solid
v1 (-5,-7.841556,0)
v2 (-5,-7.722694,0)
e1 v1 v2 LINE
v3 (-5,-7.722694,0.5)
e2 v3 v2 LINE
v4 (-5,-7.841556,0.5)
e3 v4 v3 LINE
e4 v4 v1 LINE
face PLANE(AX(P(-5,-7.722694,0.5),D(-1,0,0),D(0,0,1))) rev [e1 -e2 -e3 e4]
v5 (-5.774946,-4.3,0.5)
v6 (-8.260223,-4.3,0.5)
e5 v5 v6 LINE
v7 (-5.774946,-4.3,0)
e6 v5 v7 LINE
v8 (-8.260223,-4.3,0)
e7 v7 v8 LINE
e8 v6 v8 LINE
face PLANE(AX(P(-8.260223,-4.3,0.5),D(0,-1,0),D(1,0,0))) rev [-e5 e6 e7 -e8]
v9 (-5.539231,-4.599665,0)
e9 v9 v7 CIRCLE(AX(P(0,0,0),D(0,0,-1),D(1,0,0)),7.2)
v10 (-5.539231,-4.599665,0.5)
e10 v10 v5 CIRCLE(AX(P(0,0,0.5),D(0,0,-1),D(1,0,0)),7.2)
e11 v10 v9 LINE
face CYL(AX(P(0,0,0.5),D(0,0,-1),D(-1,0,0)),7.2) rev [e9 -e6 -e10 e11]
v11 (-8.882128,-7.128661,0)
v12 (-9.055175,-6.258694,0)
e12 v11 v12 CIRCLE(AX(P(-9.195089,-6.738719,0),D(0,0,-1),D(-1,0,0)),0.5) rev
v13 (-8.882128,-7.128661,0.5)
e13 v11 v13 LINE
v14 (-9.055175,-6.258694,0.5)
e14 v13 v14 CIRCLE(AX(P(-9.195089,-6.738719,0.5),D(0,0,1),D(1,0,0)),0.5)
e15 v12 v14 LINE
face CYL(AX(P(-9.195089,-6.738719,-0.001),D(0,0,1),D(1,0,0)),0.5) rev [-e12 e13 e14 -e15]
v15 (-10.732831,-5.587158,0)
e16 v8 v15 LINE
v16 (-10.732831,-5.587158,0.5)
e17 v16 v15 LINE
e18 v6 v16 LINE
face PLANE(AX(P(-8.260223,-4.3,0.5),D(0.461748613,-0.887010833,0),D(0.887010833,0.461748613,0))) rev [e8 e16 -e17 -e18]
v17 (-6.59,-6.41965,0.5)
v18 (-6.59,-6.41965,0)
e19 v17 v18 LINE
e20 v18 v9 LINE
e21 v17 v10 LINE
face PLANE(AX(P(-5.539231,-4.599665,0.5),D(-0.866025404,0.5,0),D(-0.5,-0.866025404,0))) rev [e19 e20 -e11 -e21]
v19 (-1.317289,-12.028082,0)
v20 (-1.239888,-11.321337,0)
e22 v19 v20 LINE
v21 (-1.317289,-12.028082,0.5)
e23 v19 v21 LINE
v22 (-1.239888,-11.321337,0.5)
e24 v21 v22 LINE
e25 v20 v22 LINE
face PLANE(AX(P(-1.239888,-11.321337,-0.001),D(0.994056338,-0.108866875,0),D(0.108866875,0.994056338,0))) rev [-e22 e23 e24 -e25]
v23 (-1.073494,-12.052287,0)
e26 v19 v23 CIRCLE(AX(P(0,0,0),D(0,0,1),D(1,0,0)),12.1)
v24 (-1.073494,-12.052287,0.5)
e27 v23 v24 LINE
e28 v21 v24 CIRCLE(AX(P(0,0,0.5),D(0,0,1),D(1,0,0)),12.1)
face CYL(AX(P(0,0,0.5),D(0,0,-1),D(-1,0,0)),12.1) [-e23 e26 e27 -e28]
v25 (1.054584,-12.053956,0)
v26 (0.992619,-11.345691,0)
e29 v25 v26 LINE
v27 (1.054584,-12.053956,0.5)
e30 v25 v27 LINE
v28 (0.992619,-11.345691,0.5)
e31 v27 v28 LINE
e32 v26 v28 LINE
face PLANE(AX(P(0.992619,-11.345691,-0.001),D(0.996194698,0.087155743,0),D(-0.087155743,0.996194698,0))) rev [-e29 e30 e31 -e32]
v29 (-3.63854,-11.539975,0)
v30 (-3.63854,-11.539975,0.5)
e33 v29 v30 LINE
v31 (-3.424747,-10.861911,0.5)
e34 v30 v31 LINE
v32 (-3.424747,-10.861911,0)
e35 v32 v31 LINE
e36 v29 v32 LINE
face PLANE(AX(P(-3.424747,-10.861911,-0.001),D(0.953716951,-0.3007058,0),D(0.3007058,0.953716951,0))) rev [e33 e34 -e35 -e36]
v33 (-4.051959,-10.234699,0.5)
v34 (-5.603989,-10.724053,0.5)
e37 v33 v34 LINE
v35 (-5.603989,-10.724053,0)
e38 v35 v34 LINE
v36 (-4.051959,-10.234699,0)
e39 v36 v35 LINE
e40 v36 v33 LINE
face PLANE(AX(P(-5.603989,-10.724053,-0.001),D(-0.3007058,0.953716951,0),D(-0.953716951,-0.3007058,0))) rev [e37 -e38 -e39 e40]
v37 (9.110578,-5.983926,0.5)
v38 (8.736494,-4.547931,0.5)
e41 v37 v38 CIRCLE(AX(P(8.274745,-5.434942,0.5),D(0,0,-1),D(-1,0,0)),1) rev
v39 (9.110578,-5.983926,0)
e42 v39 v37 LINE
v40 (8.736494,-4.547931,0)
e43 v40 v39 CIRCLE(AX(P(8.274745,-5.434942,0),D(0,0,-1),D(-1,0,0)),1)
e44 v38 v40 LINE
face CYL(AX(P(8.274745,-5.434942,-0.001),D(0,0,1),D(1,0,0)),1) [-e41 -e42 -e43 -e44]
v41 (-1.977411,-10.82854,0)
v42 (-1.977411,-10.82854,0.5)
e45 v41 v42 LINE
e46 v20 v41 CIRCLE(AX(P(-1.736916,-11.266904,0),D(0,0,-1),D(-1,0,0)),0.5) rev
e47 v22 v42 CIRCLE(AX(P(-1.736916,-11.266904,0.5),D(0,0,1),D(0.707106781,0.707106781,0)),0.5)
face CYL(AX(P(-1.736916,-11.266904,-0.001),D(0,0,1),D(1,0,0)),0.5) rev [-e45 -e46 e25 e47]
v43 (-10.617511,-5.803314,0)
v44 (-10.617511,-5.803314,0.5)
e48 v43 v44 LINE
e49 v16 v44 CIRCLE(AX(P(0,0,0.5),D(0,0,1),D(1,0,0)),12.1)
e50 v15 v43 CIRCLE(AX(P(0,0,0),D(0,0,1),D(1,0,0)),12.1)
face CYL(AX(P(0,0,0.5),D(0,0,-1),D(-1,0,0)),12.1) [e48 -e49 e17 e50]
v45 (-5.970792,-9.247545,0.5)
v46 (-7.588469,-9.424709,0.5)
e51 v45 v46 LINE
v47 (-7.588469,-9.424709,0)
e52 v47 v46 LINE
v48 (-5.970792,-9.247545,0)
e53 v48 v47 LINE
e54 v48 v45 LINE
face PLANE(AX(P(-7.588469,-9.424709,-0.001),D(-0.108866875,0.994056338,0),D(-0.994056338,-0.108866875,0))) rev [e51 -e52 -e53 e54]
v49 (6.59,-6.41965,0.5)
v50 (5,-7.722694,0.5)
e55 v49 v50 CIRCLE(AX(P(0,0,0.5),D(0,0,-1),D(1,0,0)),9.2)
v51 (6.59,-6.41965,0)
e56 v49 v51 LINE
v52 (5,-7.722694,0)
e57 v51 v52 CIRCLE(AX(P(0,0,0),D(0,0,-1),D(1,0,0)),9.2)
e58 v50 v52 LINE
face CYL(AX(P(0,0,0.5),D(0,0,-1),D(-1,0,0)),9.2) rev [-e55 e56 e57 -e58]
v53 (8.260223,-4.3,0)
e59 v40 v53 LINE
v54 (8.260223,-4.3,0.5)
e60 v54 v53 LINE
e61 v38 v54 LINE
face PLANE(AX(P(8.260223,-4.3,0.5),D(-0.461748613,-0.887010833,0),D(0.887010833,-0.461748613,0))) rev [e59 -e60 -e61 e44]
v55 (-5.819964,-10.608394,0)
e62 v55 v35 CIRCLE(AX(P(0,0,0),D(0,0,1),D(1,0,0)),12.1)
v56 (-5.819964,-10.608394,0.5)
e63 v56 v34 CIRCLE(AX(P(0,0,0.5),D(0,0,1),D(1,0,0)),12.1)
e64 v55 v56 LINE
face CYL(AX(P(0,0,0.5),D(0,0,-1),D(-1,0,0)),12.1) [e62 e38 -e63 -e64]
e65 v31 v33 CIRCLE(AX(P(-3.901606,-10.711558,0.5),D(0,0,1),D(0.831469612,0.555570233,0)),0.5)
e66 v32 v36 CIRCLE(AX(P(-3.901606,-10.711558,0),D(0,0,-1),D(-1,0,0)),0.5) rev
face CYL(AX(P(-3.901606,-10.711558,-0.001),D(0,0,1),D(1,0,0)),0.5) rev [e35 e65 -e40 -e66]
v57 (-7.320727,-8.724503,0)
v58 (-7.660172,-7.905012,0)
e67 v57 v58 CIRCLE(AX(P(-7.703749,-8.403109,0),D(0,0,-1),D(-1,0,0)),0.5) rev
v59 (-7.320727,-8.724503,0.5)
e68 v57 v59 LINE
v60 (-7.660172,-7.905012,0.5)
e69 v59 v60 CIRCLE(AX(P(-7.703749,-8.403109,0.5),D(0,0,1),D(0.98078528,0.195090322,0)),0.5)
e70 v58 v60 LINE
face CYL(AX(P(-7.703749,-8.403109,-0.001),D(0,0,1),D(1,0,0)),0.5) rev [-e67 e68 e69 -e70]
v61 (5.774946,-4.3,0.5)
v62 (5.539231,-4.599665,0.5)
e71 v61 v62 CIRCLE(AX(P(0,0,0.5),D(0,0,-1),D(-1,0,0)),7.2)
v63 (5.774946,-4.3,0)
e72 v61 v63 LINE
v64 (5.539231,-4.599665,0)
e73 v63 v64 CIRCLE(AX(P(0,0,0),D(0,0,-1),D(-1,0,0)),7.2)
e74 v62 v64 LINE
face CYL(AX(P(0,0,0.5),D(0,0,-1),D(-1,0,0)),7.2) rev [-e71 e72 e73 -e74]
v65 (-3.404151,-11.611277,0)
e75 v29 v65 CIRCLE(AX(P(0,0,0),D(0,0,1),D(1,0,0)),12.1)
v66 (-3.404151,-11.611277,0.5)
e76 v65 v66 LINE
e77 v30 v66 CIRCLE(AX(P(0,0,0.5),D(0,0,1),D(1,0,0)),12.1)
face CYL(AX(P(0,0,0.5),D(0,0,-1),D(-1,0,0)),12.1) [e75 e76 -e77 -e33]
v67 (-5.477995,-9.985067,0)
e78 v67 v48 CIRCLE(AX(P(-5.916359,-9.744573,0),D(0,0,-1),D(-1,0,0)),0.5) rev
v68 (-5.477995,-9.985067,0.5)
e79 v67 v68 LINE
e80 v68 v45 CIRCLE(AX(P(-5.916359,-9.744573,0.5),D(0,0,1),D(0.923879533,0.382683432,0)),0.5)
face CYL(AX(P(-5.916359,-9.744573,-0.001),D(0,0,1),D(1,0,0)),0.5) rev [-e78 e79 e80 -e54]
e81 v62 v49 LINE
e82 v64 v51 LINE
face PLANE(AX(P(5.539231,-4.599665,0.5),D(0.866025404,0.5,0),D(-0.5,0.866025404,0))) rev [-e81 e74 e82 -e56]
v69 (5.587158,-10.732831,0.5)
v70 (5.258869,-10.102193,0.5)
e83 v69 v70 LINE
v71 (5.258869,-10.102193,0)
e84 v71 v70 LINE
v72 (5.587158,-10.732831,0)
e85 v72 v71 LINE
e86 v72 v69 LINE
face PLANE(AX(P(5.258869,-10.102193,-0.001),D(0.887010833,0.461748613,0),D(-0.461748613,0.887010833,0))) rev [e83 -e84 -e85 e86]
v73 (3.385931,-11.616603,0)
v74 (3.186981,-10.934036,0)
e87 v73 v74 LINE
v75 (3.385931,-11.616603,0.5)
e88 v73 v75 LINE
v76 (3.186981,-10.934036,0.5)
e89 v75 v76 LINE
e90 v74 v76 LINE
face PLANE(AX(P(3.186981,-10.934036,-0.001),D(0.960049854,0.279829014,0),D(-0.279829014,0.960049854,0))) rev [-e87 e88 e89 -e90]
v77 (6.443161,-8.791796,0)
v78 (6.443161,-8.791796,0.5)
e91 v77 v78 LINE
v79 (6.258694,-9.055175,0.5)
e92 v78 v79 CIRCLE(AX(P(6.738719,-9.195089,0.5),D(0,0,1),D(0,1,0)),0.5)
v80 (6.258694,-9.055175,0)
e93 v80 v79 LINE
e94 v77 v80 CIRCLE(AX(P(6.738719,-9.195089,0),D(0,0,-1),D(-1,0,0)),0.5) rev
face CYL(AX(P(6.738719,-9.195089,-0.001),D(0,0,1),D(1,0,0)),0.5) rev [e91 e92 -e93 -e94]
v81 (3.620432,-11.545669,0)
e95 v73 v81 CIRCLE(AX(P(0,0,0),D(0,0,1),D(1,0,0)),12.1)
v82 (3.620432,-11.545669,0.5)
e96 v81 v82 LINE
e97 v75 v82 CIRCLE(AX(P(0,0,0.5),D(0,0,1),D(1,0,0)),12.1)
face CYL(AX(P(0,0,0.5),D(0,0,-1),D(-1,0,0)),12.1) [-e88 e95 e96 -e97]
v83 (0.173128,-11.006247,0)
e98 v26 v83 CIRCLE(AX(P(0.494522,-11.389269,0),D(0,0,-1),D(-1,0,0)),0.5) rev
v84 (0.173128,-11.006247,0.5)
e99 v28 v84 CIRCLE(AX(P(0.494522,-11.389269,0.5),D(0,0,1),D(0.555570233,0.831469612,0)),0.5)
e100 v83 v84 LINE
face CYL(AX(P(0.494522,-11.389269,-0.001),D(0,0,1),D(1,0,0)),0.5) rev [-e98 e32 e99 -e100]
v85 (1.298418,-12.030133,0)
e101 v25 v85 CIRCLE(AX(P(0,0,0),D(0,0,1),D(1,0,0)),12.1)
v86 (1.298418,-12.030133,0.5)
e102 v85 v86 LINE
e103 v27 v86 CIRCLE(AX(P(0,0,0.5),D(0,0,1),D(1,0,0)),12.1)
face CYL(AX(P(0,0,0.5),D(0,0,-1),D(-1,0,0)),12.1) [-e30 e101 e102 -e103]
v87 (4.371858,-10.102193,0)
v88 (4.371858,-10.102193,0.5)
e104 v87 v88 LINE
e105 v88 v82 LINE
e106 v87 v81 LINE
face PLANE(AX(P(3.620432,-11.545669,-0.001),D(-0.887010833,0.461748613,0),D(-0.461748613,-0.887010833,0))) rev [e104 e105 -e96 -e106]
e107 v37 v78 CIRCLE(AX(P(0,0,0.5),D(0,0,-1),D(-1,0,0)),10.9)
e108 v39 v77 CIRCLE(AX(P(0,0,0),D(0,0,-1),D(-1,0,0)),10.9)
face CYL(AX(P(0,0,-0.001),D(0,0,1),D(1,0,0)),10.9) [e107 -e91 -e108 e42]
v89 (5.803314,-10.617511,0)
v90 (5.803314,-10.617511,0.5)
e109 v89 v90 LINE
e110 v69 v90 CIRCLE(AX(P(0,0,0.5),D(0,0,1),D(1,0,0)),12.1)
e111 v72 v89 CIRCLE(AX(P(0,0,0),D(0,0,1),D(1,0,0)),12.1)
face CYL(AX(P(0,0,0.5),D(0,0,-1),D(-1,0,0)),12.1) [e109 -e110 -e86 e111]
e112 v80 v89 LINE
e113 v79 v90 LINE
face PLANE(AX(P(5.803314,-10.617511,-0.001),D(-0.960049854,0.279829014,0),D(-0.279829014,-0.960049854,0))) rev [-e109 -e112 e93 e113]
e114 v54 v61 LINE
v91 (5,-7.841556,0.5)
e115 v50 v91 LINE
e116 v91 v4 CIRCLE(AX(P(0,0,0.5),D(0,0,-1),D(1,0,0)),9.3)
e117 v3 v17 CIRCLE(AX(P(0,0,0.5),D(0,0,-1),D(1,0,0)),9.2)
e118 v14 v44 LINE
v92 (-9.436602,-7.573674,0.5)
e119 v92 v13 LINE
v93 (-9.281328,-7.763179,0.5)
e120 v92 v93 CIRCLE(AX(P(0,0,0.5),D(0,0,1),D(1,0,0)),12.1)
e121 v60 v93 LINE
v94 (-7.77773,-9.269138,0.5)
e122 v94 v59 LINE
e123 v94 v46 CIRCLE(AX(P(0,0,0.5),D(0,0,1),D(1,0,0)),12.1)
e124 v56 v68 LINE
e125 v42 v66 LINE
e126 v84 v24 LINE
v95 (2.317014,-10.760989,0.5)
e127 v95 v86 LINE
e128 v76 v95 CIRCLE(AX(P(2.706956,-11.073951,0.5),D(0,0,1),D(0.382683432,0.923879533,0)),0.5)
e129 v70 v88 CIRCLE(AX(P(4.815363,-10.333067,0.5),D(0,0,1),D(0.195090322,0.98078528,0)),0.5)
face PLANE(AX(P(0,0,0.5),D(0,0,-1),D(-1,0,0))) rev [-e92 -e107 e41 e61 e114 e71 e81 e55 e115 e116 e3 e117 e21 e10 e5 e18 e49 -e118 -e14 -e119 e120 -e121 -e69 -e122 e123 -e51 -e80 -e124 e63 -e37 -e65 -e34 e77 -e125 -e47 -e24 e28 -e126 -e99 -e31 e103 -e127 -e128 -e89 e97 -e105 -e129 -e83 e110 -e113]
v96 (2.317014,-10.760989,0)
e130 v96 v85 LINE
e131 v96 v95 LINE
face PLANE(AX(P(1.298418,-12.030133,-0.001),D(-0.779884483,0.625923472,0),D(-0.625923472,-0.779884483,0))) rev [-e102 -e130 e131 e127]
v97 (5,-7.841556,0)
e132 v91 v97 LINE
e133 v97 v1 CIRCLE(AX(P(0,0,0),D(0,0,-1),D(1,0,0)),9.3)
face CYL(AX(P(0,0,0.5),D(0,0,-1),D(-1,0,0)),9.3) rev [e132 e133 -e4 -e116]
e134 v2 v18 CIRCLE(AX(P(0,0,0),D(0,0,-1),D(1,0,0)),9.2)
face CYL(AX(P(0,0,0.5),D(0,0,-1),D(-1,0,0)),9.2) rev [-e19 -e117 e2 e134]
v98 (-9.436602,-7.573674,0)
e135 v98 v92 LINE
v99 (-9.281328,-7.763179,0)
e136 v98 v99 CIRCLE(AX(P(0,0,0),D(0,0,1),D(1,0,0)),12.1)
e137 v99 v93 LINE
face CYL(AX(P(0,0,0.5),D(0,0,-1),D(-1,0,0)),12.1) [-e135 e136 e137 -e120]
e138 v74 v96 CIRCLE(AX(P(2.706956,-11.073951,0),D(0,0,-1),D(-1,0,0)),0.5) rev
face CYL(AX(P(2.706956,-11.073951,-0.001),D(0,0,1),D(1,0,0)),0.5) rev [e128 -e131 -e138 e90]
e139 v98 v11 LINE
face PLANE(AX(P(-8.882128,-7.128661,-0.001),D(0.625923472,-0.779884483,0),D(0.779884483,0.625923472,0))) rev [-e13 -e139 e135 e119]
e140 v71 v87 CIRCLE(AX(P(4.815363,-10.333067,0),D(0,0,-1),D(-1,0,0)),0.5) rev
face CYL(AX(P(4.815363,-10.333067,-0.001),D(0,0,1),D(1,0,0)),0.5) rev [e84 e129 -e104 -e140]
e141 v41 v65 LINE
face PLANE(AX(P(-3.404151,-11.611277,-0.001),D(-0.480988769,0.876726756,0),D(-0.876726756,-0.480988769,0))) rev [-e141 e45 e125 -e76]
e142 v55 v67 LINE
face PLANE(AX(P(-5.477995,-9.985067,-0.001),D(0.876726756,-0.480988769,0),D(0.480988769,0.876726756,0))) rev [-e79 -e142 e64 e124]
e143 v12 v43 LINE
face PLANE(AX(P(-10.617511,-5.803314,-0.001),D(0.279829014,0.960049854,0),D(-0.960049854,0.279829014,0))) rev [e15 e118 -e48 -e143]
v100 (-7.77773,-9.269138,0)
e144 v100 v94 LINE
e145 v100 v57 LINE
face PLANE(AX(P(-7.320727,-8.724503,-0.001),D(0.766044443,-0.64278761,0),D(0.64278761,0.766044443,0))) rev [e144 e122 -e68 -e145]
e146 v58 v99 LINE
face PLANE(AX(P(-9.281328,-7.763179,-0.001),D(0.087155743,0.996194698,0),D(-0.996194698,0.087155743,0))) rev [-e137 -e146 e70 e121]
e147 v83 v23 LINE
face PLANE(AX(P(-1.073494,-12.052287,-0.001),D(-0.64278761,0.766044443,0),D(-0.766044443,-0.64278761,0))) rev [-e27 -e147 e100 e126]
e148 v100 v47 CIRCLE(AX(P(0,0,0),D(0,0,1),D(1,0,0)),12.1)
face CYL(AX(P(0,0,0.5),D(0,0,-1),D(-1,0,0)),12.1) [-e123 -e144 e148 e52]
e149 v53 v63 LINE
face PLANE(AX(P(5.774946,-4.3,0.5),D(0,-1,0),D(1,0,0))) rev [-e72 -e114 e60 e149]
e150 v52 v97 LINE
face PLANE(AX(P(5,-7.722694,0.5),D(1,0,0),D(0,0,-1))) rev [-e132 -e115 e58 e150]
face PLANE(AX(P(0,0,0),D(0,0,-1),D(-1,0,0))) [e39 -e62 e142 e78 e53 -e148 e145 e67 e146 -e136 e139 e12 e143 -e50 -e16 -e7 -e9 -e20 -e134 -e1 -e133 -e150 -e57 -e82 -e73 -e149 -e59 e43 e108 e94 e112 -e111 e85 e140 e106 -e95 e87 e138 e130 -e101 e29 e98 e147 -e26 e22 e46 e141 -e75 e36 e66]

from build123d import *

# Parameters (mm, degrees)
OTHER_10076_5_DEPTH = 0.5
CUT_EXTRUDE1_REACH  = 18.147


# Read off the part's stored shape, not the designer's step: 10076-5
with BuildPart() as part:
    # Other 10076-5 outline → Other 10076-5 (new body)
    with BuildSketch(Plane.XY):
        with BuildLine():
            ThreePointArc((7.573674013, -9.436602245), (7.668819519, -9.359444812), (7.763179028, -9.281328104))
            Line((7.763179028, -9.281328104), (7.919995926, -7.488902759))
            ThreePointArc((7.919995926, -7.488902759), (8.548470738, -6.76266575), (9.110578105, -5.983925684))
            ThreePointArc((9.110578105, -5.983925684), (9.242448569, -5.182849851), (8.736493865, -4.547930843))
            Line((8.736493865, -4.547930843), (8.260223146, -4.3))
            Line((8.260223146, -4.3), (5.774945887, -4.3))
            ThreePointArc((5.774945887, -4.3), (5.659072475, -4.451392897), (5.53923133, -4.5996648))
            Line((5.53923133, -4.5996648), (6.59, -6.419649523))
            ThreePointArc((6.59, -6.419649523), (5.831509763, -7.1157216), (5, -7.722693831))
            Line((5, -7.722693831), (5, -7.841555968))
            ThreePointArc((5, -7.841555968), (0, -9.3), (-5, -7.841555968))
            Line((-5, -7.841555968), (-5, -7.722693831))
            ThreePointArc((-5, -7.722693831), (-5.831509763, -7.1157216), (-6.59, -6.419649523))
            Line((-6.59, -6.419649523), (-5.53923133, -4.5996648))
            ThreePointArc((-5.53923133, -4.5996648), (-5.659072475, -4.451392897), (-5.774945887, -4.3))
            Line((-5.774945887, -4.3), (-8.260223146, -4.3))
            Line((-8.260223146, -4.3), (-10.732831081, -5.58715822))
            ThreePointArc((-10.732831081, -5.58715822), (-10.675718173, -5.6955282), (-10.617511084, -5.803314431))
            Line((-10.617511084, -5.803314431), (-9.055174855, -6.258693914))
            ThreePointArc((-9.055174855, -6.258693914), (-8.704696722, -6.64117368), (-8.882127626, -7.128661083))
            Line((-8.882127626, -7.128661083), (-9.436602245, -7.573674013))
            ThreePointArc((-9.436602245, -7.573674013), (-9.359444812, -7.668819519), (-9.281328104, -7.763179028))
            Line((-9.281328104, -7.763179028), (-7.660171598, -7.905011844))
            ThreePointArc((-7.660171598, -7.905011844), (-7.241809703, -8.211767477), (-7.320727248, -8.724502998))
            Line((-7.320727248, -8.724502998), (-7.777730077, -9.269137762))
            ThreePointArc((-7.777730077, -9.269137762), (-7.683493234, -9.347402405), (-7.588468891, -9.424709008))
            Line((-7.588468891, -9.424709008), (-5.970792243, -9.247544602))
            ThreePointArc((-5.970792243, -9.247544602), (-5.500623999, -9.466787654), (-5.477995427, -9.985067155))
            Line((-5.477995427, -9.985067155), (-5.819964104, -10.608393744))
            ThreePointArc((-5.819964104, -10.608393744), (-5.712269322, -10.666769858), (-5.603989074, -10.724052707))
            Line((-5.603989074, -10.724052707), (-4.05195869, -10.234699407))
            ThreePointArc((-4.05195869, -10.234699407), (-3.548052399, -10.358004491), (-3.424747314, -10.861910782))
            Line((-3.424747314, -10.861910782), (-3.638540174, -11.539975104))
            ThreePointArc((-3.638540174, -11.539975104), (-3.521526102, -11.576219327), (-3.404151099, -11.611277074))
            Line((-3.404151099, -11.611277074), (-1.977410637, -10.828540453))
            ThreePointArc((-1.977410637, -10.828540453), (-1.459131136, -10.851169025), (-1.239888083, -11.321337268))
            Line((-1.239888083, -11.321337268), (-1.317289186, -12.028081692))
            ThreePointArc((-1.317289186, -12.028081692), (-1.195452609, -12.04080118), (-1.073493507, -12.052286575))
            Line((-1.073493507, -12.052286575), (0.173128198, -11.006246762))
            ThreePointArc((0.173128198, -11.006246762), (0.685863719, -10.927329218), (0.992619352, -11.345691113))
            Line((0.992619352, -11.345691113), (1.054584487, -12.053955847))
            ThreePointArc((1.054584487, -12.053955847), (1.176561457, -12.042661796), (1.298417839, -12.030133462))
            Line((1.298417839, -12.030133462), (2.317013814, -10.760989181))
            ThreePointArc((2.317013814, -10.760989181), (2.804501216, -10.583558277), (3.186980982, -10.93403641))
            Line((3.186980982, -10.93403641), (3.38593107, -11.616603238))
            ThreePointArc((3.38593107, -11.616603238), (3.503360927, -11.581729673), (3.620431715, -11.545669067))
            Line((3.620431715, -11.545669067), (4.371857887, -10.10219282))
            ThreePointArc((4.371857887, -10.10219282), (4.815363304, -9.833067127), (5.258868721, -10.10219282))
            Line((5.258868721, -10.10219282), (5.58715822, -10.732831081))
            ThreePointArc((5.58715822, -10.732831081), (5.6955282, -10.675718173), (5.803314431, -10.617511084))
            Line((5.803314431, -10.617511084), (6.258693914, -9.055174855))
            ThreePointArc((6.258693914, -9.055174855), (6.64117368, -8.704696722), (7.128661083, -8.882127626))
            Line((7.128661083, -8.882127626), (7.573674013, -9.436602245))
        make_face()
    extrude(amount=OTHER_10076_5_DEPTH)

    # Sketch1 → Cut-Extrude1 (cut, up to next)
    with BuildSketch(Plane.XY.offset(0.5), mode=Mode.PRIVATE) as cut_extrude1_sk1:
        with BuildLine():
            Line((7.573674013, -9.436602245), (7.128661083, -8.882127626))
            ThreePointArc((7.128661083, -8.882127626), (6.804041546, -8.699374782), (6.443160998, -8.791795969))
            ThreePointArc((6.443160998, -8.791795969), (7.211064546, -8.173771964), (7.919995926, -7.488902759))
            Line((7.919995926, -7.488902759), (7.763179028, -9.281328104))
            ThreePointArc((7.763179028, -9.281328104), (7.668819519, -9.359444812), (7.573674013, -9.436602245))
        make_face()
    cut_extrude1_tool1 = extrude(cut_extrude1_sk1.sketch, amount=-CUT_EXTRUDE1_REACH, mode=Mode.PRIVATE) & part.part
    add(cut_extrude1_tool1.solids().sort_by_distance((7.456757, -8.533041, 0.5))[0], mode=Mode.SUBTRACT)


solid = part.part
